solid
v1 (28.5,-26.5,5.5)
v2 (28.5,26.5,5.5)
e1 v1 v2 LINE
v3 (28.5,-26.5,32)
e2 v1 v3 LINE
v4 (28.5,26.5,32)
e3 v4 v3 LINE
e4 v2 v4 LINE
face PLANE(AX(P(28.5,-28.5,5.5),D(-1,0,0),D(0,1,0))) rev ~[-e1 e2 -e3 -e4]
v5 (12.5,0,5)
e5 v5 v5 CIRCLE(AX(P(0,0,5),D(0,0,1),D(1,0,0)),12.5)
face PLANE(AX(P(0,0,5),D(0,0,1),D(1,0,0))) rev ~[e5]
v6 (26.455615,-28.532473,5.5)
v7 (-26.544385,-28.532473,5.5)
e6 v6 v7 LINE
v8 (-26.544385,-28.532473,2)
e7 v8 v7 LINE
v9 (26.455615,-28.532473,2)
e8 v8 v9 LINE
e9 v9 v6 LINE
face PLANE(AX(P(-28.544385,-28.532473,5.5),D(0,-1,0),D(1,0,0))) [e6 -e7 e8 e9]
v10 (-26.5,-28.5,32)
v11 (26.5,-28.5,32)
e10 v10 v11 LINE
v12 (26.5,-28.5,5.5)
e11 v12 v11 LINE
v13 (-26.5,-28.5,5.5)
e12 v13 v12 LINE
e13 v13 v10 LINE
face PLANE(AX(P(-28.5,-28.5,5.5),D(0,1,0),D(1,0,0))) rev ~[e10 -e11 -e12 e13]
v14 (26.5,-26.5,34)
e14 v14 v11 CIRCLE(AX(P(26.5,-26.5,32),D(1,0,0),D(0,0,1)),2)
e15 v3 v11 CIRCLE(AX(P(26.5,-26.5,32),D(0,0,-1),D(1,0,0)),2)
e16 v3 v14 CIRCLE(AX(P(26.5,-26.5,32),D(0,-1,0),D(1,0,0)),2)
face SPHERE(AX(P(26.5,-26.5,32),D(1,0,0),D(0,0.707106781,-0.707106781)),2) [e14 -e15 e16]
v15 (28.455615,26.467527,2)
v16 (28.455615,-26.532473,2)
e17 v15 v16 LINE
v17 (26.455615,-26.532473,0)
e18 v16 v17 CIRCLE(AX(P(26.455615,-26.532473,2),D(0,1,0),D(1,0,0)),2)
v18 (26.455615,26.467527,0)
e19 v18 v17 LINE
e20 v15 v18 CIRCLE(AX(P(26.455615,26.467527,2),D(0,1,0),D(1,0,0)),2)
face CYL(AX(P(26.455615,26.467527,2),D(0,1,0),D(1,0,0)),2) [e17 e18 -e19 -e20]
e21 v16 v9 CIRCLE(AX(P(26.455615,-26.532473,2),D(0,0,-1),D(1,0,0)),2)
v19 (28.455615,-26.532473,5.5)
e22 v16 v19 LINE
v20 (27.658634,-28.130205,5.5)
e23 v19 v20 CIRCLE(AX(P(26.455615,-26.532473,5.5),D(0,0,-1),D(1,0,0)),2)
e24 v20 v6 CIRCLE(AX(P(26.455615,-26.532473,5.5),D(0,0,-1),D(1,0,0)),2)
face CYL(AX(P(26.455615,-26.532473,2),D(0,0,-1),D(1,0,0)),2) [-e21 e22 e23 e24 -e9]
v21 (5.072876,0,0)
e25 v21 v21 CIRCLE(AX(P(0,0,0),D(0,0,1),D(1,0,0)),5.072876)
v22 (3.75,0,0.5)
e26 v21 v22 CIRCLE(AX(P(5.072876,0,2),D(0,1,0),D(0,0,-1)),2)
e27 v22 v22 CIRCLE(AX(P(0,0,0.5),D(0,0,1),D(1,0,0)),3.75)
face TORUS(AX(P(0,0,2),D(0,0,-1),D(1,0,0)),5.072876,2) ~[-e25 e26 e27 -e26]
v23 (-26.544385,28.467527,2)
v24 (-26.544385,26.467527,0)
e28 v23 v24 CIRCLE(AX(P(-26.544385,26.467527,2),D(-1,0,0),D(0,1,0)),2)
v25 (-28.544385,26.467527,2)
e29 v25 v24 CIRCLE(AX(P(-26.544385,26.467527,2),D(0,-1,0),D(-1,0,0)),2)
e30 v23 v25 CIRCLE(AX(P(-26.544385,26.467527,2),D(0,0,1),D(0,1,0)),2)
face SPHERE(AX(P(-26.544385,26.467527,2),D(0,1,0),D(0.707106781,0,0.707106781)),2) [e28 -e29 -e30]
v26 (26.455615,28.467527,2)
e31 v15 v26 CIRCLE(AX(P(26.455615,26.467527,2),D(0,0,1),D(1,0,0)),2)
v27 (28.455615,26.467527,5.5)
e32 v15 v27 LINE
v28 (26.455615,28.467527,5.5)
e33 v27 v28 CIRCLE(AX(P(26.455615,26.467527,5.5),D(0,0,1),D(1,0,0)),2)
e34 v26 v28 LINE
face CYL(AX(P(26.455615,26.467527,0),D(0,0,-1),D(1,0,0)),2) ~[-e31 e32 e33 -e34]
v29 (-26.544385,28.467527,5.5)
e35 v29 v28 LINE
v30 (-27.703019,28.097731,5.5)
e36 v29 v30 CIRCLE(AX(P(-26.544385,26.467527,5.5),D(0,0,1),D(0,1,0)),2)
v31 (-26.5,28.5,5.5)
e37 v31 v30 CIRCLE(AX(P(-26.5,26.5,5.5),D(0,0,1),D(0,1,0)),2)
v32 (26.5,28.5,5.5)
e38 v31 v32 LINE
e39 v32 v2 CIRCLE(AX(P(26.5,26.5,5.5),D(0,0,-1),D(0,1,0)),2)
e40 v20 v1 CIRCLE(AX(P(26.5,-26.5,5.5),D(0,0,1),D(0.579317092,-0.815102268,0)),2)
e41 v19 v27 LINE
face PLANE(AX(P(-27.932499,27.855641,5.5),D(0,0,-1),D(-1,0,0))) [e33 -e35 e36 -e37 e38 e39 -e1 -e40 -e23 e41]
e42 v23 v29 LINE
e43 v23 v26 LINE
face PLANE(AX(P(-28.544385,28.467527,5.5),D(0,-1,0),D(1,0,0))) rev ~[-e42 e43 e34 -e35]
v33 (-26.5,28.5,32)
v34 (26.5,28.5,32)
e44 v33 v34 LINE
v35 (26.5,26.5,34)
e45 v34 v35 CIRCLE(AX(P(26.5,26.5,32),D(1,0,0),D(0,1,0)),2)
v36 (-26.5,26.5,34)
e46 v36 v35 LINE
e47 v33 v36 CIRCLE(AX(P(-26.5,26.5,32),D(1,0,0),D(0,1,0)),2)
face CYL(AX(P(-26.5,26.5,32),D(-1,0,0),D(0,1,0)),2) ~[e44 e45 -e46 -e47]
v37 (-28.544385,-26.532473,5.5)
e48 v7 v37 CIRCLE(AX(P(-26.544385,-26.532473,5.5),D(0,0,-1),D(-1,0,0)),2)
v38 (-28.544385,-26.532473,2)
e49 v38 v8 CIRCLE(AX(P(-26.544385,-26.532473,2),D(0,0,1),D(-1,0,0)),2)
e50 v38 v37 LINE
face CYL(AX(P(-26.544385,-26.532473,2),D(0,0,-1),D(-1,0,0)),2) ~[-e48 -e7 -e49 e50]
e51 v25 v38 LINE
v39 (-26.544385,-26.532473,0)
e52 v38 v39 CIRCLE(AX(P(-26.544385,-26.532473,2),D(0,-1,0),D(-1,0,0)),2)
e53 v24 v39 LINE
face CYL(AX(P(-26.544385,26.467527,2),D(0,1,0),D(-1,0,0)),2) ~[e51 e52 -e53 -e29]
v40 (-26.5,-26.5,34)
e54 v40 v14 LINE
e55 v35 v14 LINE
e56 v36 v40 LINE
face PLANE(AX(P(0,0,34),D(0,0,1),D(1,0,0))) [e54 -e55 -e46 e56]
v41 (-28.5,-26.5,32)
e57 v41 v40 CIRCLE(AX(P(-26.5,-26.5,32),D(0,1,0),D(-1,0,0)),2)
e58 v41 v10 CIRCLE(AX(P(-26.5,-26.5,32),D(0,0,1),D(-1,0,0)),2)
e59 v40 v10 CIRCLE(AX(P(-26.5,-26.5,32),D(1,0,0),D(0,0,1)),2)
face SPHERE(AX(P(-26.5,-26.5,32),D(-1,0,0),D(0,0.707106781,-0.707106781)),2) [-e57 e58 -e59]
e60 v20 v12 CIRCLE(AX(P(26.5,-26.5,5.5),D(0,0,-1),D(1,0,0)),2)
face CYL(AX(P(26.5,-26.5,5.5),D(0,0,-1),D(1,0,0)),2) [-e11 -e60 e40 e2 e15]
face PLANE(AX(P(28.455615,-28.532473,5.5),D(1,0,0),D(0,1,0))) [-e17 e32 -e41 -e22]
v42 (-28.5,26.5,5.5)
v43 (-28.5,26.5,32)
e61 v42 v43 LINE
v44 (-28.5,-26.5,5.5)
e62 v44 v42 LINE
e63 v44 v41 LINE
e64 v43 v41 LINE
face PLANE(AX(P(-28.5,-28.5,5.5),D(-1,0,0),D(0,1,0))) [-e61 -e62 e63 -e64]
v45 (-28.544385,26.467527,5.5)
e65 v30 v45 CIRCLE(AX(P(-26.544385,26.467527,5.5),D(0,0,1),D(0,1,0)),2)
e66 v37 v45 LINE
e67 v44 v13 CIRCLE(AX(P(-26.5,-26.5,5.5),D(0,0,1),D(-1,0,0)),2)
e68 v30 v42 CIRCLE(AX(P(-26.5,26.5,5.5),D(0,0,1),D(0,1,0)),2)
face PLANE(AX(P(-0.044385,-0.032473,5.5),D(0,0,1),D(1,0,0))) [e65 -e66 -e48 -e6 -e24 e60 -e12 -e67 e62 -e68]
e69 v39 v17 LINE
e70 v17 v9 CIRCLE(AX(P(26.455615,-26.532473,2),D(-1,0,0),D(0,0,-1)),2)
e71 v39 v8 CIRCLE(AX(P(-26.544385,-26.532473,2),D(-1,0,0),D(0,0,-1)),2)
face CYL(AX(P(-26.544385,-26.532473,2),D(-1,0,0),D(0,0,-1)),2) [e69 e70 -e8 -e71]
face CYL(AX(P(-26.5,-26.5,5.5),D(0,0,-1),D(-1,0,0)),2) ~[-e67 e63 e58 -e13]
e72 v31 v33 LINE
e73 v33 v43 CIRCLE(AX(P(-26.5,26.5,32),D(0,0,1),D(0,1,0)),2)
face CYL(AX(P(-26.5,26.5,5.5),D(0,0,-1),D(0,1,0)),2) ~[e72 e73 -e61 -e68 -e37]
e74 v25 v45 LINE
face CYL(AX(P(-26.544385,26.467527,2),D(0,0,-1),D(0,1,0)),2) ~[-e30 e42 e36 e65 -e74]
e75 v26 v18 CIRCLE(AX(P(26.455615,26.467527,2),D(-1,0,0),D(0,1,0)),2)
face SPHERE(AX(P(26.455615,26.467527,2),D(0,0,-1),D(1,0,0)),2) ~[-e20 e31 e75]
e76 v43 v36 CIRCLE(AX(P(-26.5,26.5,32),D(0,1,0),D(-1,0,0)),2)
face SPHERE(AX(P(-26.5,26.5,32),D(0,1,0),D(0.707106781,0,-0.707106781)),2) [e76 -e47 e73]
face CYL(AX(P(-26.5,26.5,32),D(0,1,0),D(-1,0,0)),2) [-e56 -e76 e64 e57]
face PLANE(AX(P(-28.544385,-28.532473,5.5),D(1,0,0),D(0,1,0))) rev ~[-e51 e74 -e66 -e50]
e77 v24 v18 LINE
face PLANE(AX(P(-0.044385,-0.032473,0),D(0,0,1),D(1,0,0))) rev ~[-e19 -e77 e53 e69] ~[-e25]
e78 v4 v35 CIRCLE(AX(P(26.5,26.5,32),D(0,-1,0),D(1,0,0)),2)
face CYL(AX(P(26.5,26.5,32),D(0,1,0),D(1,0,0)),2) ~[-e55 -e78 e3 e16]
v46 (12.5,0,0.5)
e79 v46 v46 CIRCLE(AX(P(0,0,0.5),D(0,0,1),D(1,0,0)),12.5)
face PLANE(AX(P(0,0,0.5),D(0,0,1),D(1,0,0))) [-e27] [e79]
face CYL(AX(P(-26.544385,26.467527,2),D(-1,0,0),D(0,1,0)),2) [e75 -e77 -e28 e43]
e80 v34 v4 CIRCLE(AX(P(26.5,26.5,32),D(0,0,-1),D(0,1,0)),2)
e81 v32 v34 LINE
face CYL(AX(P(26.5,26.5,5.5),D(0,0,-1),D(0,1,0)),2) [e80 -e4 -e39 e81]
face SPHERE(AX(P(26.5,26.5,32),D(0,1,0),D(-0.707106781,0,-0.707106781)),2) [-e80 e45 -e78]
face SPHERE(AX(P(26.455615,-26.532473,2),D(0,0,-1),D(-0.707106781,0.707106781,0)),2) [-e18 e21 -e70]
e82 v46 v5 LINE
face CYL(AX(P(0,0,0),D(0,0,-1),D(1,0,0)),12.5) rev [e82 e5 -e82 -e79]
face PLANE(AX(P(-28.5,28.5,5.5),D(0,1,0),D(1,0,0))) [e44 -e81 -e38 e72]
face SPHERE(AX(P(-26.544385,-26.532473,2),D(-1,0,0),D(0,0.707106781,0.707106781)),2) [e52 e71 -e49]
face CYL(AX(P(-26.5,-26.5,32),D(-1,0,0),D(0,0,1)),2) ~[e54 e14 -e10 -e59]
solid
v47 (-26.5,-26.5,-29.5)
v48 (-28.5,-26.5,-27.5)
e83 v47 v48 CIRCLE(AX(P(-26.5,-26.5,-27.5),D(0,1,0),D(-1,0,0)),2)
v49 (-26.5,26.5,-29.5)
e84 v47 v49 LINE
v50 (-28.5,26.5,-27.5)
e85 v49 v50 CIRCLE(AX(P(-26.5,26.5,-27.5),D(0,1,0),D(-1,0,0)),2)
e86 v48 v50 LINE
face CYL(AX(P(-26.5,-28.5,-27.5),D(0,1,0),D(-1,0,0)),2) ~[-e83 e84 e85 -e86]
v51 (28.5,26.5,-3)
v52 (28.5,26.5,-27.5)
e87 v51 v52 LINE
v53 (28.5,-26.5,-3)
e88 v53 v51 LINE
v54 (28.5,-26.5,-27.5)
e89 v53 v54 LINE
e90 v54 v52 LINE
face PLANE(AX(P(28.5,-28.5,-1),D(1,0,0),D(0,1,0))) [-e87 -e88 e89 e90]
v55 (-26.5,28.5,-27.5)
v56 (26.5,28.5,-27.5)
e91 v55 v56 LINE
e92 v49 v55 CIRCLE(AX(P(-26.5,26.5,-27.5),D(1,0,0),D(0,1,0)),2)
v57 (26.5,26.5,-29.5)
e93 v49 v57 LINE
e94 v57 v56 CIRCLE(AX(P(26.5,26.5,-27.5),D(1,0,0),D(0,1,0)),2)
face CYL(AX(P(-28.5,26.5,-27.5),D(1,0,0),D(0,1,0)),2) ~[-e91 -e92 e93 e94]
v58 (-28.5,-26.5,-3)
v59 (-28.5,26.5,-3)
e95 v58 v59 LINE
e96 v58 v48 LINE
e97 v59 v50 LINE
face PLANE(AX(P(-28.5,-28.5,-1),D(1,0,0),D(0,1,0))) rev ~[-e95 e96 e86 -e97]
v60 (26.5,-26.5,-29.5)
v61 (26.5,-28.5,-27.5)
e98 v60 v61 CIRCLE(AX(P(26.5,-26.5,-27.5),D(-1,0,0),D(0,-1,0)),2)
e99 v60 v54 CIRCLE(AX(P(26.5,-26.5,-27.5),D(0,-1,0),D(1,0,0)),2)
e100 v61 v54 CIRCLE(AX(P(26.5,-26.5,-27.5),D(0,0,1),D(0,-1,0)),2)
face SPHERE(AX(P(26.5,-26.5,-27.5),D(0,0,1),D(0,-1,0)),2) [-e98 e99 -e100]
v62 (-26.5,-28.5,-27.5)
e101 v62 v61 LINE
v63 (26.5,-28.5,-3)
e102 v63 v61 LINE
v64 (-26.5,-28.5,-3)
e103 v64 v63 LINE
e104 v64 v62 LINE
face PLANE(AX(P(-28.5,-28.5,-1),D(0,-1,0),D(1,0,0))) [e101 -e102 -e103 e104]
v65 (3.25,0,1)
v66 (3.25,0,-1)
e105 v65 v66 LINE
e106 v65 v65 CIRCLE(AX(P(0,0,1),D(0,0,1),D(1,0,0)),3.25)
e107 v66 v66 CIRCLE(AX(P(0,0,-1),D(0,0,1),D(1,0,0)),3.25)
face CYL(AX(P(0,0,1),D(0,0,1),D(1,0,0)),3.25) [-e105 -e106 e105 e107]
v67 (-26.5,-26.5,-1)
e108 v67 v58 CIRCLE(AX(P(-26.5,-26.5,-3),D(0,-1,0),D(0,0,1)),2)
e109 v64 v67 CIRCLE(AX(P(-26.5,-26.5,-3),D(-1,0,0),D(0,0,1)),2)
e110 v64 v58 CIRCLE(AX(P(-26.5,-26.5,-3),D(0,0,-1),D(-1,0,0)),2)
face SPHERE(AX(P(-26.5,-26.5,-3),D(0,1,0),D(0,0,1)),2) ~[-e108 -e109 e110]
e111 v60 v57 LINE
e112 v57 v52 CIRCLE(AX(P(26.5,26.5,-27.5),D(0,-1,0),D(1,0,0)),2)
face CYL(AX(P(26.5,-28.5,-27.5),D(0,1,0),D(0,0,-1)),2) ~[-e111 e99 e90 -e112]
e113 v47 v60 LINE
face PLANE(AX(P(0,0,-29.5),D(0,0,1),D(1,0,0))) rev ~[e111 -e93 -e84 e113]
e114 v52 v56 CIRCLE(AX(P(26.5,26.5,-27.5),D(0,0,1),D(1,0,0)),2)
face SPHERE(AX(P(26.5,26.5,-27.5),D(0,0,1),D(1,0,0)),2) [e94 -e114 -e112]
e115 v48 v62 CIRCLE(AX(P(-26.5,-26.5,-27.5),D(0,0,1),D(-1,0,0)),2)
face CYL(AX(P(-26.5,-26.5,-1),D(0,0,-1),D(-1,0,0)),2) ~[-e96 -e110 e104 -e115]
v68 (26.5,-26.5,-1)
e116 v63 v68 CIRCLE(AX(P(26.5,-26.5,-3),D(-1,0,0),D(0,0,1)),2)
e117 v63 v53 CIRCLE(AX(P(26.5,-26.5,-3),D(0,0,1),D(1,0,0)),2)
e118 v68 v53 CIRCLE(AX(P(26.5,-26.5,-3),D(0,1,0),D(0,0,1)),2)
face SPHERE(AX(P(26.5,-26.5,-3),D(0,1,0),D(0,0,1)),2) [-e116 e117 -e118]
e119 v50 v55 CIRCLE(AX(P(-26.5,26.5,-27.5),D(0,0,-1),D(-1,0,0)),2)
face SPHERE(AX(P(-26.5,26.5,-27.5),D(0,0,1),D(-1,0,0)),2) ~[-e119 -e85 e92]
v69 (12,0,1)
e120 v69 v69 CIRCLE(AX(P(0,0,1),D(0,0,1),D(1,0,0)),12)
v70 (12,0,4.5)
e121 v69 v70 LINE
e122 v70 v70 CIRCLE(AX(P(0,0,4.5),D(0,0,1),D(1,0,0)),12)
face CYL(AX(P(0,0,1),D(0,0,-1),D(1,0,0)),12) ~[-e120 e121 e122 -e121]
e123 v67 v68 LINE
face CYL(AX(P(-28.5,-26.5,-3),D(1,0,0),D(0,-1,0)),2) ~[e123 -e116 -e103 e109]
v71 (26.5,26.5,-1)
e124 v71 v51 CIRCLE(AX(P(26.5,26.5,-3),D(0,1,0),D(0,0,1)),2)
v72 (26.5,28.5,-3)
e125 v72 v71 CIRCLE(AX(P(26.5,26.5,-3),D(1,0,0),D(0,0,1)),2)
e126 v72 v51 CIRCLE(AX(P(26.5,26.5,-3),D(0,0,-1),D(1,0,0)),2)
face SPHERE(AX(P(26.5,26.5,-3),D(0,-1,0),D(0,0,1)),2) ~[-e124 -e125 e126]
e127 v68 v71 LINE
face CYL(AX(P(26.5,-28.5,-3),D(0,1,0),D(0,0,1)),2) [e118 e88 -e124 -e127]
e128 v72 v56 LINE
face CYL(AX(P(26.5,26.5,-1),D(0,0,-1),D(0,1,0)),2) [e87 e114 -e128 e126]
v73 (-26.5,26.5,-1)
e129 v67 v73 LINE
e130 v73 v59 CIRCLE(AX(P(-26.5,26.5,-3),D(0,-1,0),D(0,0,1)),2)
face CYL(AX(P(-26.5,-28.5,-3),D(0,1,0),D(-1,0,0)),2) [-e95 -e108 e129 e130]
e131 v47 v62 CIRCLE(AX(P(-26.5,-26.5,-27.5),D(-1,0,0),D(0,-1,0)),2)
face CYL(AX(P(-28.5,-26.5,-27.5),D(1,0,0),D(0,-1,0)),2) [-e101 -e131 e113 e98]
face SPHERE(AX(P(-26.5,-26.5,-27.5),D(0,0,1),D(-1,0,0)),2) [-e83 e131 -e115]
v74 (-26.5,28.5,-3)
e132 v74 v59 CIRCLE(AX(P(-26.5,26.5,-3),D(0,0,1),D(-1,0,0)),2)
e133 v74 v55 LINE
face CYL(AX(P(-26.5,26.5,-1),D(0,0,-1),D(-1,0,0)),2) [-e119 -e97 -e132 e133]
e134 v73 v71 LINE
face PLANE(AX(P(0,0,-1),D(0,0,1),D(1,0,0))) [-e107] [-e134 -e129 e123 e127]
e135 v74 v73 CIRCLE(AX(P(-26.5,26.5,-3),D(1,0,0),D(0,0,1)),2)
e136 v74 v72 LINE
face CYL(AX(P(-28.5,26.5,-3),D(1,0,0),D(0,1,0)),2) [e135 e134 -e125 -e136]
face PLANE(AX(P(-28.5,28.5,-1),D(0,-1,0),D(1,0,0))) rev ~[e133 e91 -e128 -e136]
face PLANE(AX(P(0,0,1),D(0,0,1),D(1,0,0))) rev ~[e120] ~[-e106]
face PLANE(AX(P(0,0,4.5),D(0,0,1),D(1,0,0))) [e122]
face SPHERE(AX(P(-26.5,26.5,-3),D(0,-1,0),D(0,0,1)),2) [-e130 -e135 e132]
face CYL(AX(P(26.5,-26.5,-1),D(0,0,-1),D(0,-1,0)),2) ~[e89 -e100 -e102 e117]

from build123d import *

# Parameters (mm, degrees)
F0_R          = 13.5
F0_R_2        = 12.5
F1_DEPTH      = 5
F3_R          = 12
F4_DEPTH      = 3.5
F5_R          = 12.5
F5_R_2        = 3.75
F6_DEPTH      = 0.5
F8_R          = 13.5
F9_DEPTH      = 0.5
F10_R         = 3.25
F11_DEPTH     = 2
F13_W         = 57
F13_H         = 57
F14_DEPTH     = 28.5
F15_R         = 2
F17_W         = 57
F17_H         = 57
F18_DEPTH     = 28.5
F19_W         = 57
F19_H         = 57
F19_R         = 13.5
F20_DEPTH     = 5.5
F21_T1_DEPTH  = 26.5
F21_T3_DEPTH  = 5.5
F21_T5_DEPTH  = 53
F21_T7_DEPTH  = 53
F21_S11_W     = 2.04
F21_S11_H     = 2.04
F21_T12_DEPTH = 2.04
F21_S17_W     = 2.04
F21_S17_H     = 2.04
F21_T18_DEPTH = 2.04
F21_S23_W     = 2.04
F21_S23_H     = 2.04
F21_T24_DEPTH = 2.04
F21_S29_W     = 2.04
F21_S29_H     = 2.04
F21_T30_DEPTH = 2.04
F22_T1_DEPTH  = 3.5
F22_T3_DEPTH  = 8.5
F22_T5_DEPTH  = 53
F22_T7_DEPTH  = 53
F22_S11_W     = 2.04
F22_S11_H     = 2.04
F22_T12_DEPTH = 2.04
F22_S17_W     = 2.04
F22_S17_H     = 2.04
F22_T18_DEPTH = 2.04
F22_S23_W     = 2.04
F22_S23_H     = 2.04
F22_T24_DEPTH = 2.04
F22_T28_ANGLE = 89.9999999955


# Not quite as in the source:
# - a fillet or chamfer that OpenCascade refuses, or shapes differently, is made with other operations: its cross-section is extruded or revolved along the edge and cut away or added


with BuildPart() as f1:
    # F0 (on Top) → F1 (new body)
    with BuildSketch(Plane.XY):
        Circle(F0_R)
        Circle(F0_R_2, mode=Mode.SUBTRACT)
    extrude(amount=F1_DEPTH)

    # F5 (on Top) → F6 (join)
    with BuildSketch(Plane.XY):
        Circle(F5_R)
        Circle(F5_R_2, mode=Mode.SUBTRACT)
    extrude(amount=F6_DEPTH)

    # F8 (on offset) → F9 (join)
    with BuildSketch(Plane.XY.offset(5)):
        Circle(F8_R)
    extrude(amount=F9_DEPTH)

    # F17 (on offset) → F18 (join)
    with BuildSketch(Plane.XY.offset(5.5)):
        Rectangle(F17_W, F17_H)
    extrude(amount=F18_DEPTH)

    # F19 (on offset) → F20 (join)
    with BuildSketch(Plane.XY.offset(5.5)):
        with Locations((-0.0443849862, -0.0324733704)):
            Rectangle(F19_W, F19_H)
        Circle(F19_R, mode=Mode.SUBTRACT)
    extrude(amount=-F20_DEPTH)

    # F21: fillet of radius 2 on 9 edges, made by hand

    # F21_s2 → F21_t1 (cut)
    with BuildSketch(Plane.XY.offset(5.5)):
        with BuildLine():
            ThreePointArc((26.5, 28.5), (27.9142135624, 27.9142135624), (28.5, 26.5))
            Line((28.5, 26.5), (28.54, 26.5))
            Line((28.54, 26.5), (28.54, 28.54))
            Line((28.54, 28.54), (26.5, 28.54))
            Line((26.5, 28.54), (26.5, 28.5))
        make_face()
        with BuildLine():
            ThreePointArc((28.5, -26.5), (27.9142135624, -27.9142135624), (26.5, -28.5))
            Line((26.5, -28.5), (26.5, -28.54))
            Line((26.5, -28.54), (28.54, -28.54))
            Line((28.54, -28.54), (28.54, -26.5))
            Line((28.54, -26.5), (28.5, -26.5))
        make_face()
        with BuildLine():
            ThreePointArc((-28.5, -26.5), (-27.9142135624, -27.9142135624), (-26.5, -28.5))
            Line((-26.5, -28.5), (-26.5, -28.54))
            Line((-26.5, -28.54), (-28.54, -28.54))
            Line((-28.54, -28.54), (-28.54, -26.5))
            Line((-28.54, -26.5), (-28.5, -26.5))
        make_face()
        with BuildLine():
            ThreePointArc((-26.5, 28.5), (-27.9142135624, 27.9142135624), (-28.5, 26.5))
            Line((-28.5, 26.5), (-28.54, 26.5))
            Line((-28.54, 26.5), (-28.54, 28.54))
            Line((-28.54, 28.54), (-26.5, 28.54))
            Line((-26.5, 28.54), (-26.5, 28.5))
        make_face()
    extrude(amount=F21_T1_DEPTH, mode=Mode.SUBTRACT)

    # F21_s4 → F21_t3 (cut)
    with BuildSketch(Plane.XY):
        with BuildLine():
            ThreePointArc((28.4556150138, 26.4675266296), (27.8698285762, 27.8817401919), (26.4556150138, 28.4675266296))
            Line((26.4556150138, 28.4675266296), (26.4556150138, 28.5075266296))
            Line((26.4556150138, 28.5075266296), (28.4956150138, 28.5075266296))
            Line((28.4956150138, 28.5075266296), (28.4956150138, 26.4675266296))
            Line((28.4956150138, 26.4675266296), (28.4556150138, 26.4675266296))
        make_face()
    extrude(amount=F21_T3_DEPTH, mode=Mode.SUBTRACT)

    # F21_s6 → F21_t5 (cut)
    with BuildSketch(Plane.YZ.offset(-26.5)):
        with BuildLine():
            ThreePointArc((28.5, 32), (27.9142135624, 33.4142135624), (26.5, 34))
            Line((26.5, 34), (26.5, 34.04))
            Line((26.5, 34.04), (28.54, 34.04))
            Line((28.54, 34.04), (28.54, 32))
            Line((28.54, 32), (28.5, 32))
        make_face()
        with BuildLine():
            ThreePointArc((-26.5, 34), (-27.9142135624, 33.4142135624), (-28.5, 32))
            Line((-28.5, 32), (-28.54, 32))
            Line((-28.54, 32), (-28.54, 34.04))
            Line((-28.54, 34.04), (-26.5, 34.04))
            Line((-26.5, 34.04), (-26.5, 34))
        make_face()
    extrude(amount=F21_T5_DEPTH, mode=Mode.SUBTRACT)

    # F21_s8 → F21_t7 (cut)
    with BuildSketch(Plane.XZ.offset(-26.5)):
        with BuildLine():
            ThreePointArc((-28.5, 32), (-27.9142135624, 33.4142135624), (-26.5, 34))
            Line((-26.5, 34), (-26.5, 34.04))
            Line((-26.5, 34.04), (-28.54, 34.04))
            Line((-28.54, 34.04), (-28.54, 32))
            Line((-28.54, 32), (-28.5, 32))
        make_face()
        with BuildLine():
            ThreePointArc((28.5, 32), (27.9142135624, 33.4142135624), (26.5, 34))
            Line((26.5, 34), (26.5, 34.04))
            Line((26.5, 34.04), (28.54, 34.04))
            Line((28.54, 34.04), (28.54, 32))
            Line((28.54, 32), (28.5, 32))
        make_face()
    extrude(amount=F21_T7_DEPTH, mode=Mode.SUBTRACT)


with BuildPart() as f4:
    # F3 (on offset) → F4 (new body)
    with BuildSketch(Plane.XY.offset(1)):
        Circle(F3_R)
    extrude(amount=F4_DEPTH)

    # F10 (on offset) → F11 (join)
    with BuildSketch(Plane.XY.offset(1)):
        Circle(F10_R)
    extrude(amount=-F11_DEPTH)

    # F13 (on offset) → F14 (join)
    with BuildSketch(Plane.XY.offset(-1)):
        Rectangle(F13_W, F13_H)
    extrude(amount=-F14_DEPTH)

    # F15
    f15_edges = [f4.edges().sort_by_distance(p)[0] for p in [
        (28.5, 0, -1),
        (-28.5, 0, -1),
        (0, -28.5, -1),
        (0, 28.5, -1),
        (-28.5, 28.5, -15.25),
        (28.5, 28.5, -15.25),
        (-28.5, -28.5, -15.25),
        (28.5, -28.5, -15.25),
        (-28.5, 0, -29.5),
        (0, -28.5, -29.5),
        (28.5, 0, -29.5),
        (0, 28.5, -29.5),
    ]]
    fillet(f15_edges, radius=F15_R)


with BuildPart() as f21_tool10:
    # F21_s11 → F21_t12 (new body)
    with BuildSketch(Plane.XZ.offset(-26.5)):
        with Locations((27.52, 33.02)):
            Rectangle(F21_S11_W, F21_S11_H)
    extrude(amount=-F21_T12_DEPTH)

    # F21_s13 → F21_t14 (revolve, cut)
    with BuildSketch(Plane(origin=(26.5, 26.5, 32), x_dir=(-0.7071067812, 0, -0.7071067812), z_dir=(0.7071067812, 0, -0.7071067812))):
        with BuildLine():
            ThreePointArc((0, -2), (2, 0), (0, 2))
            Line((0, 2), (0, -2))
        make_face()
    revolve(axis=Axis((26.5, 26.5, 32), (0, 1, 0)), mode=Mode.SUBTRACT)


with BuildPart() as f1_1:
    add(f1.part)

    # F21_t9: cut F21_tool10
    add(f21_tool10.part, mode=Mode.SUBTRACT)


with BuildPart() as f21_tool16:
    # F21_s17 → F21_t18 (new body)
    with BuildSketch(Plane.XZ.offset(-26.5)):
        with Locations((-27.52, 33.02)):
            Rectangle(F21_S17_W, F21_S17_H)
    extrude(amount=-F21_T18_DEPTH)

    # F21_s19 → F21_t20 (revolve, cut)
    with BuildSketch(Plane(origin=(-26.5, 26.5, 32), x_dir=(0.7071067812, 0, -0.7071067812), z_dir=(0.7071067812, 0, 0.7071067812))):
        with BuildLine():
            ThreePointArc((0, -2), (2, 0), (0, 2))
            Line((0, 2), (0, -2))
        make_face()
    revolve(axis=Axis((-26.5, 26.5, 32), (0, 1, 0)), mode=Mode.SUBTRACT)


with BuildPart() as f1_2:
    add(f1_1.part)

    # F21_t15: cut F21_tool16
    add(f21_tool16.part, mode=Mode.SUBTRACT)


with BuildPart() as f21_tool22:
    # F21_s23 → F21_t24 (new body)
    with BuildSketch(Plane.YZ.offset(-26.5)):
        with Locations((-27.52, 33.02)):
            Rectangle(F21_S23_W, F21_S23_H)
    extrude(amount=-F21_T24_DEPTH)

    # F21_s25 → F21_t26 (revolve, cut)
    with BuildSketch(Plane(origin=(-26.5, -26.5, 32), x_dir=(0, 0.7071067812, -0.7071067812), z_dir=(0, 0.7071067812, 0.7071067812))):
        with BuildLine():
            ThreePointArc((0, -2), (2, 0), (0, 2))
            Line((0, 2), (0, -2))
        make_face()
    revolve(axis=Axis((-26.5, -26.5, 32), (-1, 0, 0)), mode=Mode.SUBTRACT)


with BuildPart() as f1_3:
    add(f1_2.part)

    # F21_t21: cut F21_tool22
    add(f21_tool22.part, mode=Mode.SUBTRACT)


with BuildPart() as f21_tool28:
    # F21_s29 → F21_t30 (new body)
    with BuildSketch(Plane.YZ.offset(26.5)):
        with Locations((-27.52, 33.02)):
            Rectangle(F21_S29_W, F21_S29_H)
    extrude(amount=F21_T30_DEPTH)

    # F21_s31 → F21_t32 (revolve, cut)
    with BuildSketch(Plane(origin=(26.5, -26.5, 32), x_dir=(0, 0.7071067812, -0.7071067812), z_dir=(0, -0.7071067812, -0.7071067812))):
        with BuildLine():
            ThreePointArc((0, -2), (2, 0), (0, 2))
            Line((0, 2), (0, -2))
        make_face()
    revolve(axis=Axis((26.5, -26.5, 32), (1, 0, 0)), mode=Mode.SUBTRACT)


with BuildPart() as f1_4:
    add(f1_3.part)

    # F21_t27: cut F21_tool28
    add(f21_tool28.part, mode=Mode.SUBTRACT)

    # F22: fillet of radius 2 on 9 edges, made by hand

    # F22_s2 → F22_t1 (cut)
    with BuildSketch(Plane.XY.offset(2)):
        with BuildLine():
            ThreePointArc((28.4556150138, -26.5324733704), (27.8698285762, -27.9466869328), (26.4556150138, -28.5324733704))
            Line((26.4556150138, -28.5324733704), (28.4556150138, -28.5324733704))
            Line((28.4556150138, -28.5324733704), (28.4556150138, -26.5324733704))
        make_face()
        with BuildLine():
            ThreePointArc((-26.5443849862, 28.4675266296), (-27.9585985485, 27.8817401919), (-28.5443849862, 26.4675266296))
            Line((-28.5443849862, 26.4675266296), (-28.5443849862, 28.4675266296))
            Line((-28.5443849862, 28.4675266296), (-26.5443849862, 28.4675266296))
        make_face()
    extrude(amount=F22_T1_DEPTH, mode=Mode.SUBTRACT)

    # F22_s4 → F22_t3 (cut)
    with BuildSketch(Plane.XY.offset(2)):
        with BuildLine():
            ThreePointArc((-28.5443849862, -26.5324733704), (-27.9585985485, -27.9466869328), (-26.5443849862, -28.5324733704))
            Line((-26.5443849862, -28.5324733704), (-28.5443849862, -28.5324733704))
            Line((-28.5443849862, -28.5324733704), (-28.5443849862, -26.5324733704))
        make_face()
    extrude(amount=F22_T3_DEPTH, mode=Mode.SUBTRACT)

    # F22_s6 → F22_t5 (cut)
    with BuildSketch(Plane.YZ.offset(-26.5443849862)):
        with BuildLine():
            ThreePointArc((28.4675266296, 2), (27.8817401919, 0.5857864376), (26.4675266296, 0))
            Line((26.4675266296, 0), (28.4675266296, 0))
            Line((28.4675266296, 0), (28.4675266296, 2))
        make_face()
        with BuildLine():
            ThreePointArc((-26.5324733704, 0), (-27.9466869328, 0.5857864376), (-28.5324733704, 2))
            Line((-28.5324733704, 2), (-28.5324733704, 0))
            Line((-28.5324733704, 0), (-26.5324733704, 0))
        make_face()
    extrude(amount=F22_T5_DEPTH, mode=Mode.SUBTRACT)

    # F22_s8 → F22_t7 (cut)
    with BuildSketch(Plane.XZ.offset(-26.4675266296)):
        with BuildLine():
            ThreePointArc((28.4556150138, 2), (27.8698285762, 0.5857864376), (26.4556150138, 0))
            Line((26.4556150138, 0), (28.4556150138, 0))
            Line((28.4556150138, 0), (28.4556150138, 2))
        make_face()
        with BuildLine():
            ThreePointArc((-28.5443849862, 2), (-27.9585985485, 0.5857864376), (-26.5443849862, 0))
            Line((-26.5443849862, 0), (-28.5443849862, 0))
            Line((-28.5443849862, 0), (-28.5443849862, 2))
        make_face()
    extrude(amount=F22_T7_DEPTH, mode=Mode.SUBTRACT)


with BuildPart() as f22_tool10:
    # F22_s11 → F22_t12 (new body)
    with BuildSketch(Plane.XY.offset(2)):
        with Locations((27.4756150138, -27.5524733704)):
            Rectangle(F22_S11_W, F22_S11_H)
    extrude(amount=-F22_T12_DEPTH)

    # F22_s13 → F22_t14 (revolve, cut)
    with BuildSketch(Plane(origin=(26.4556150138, -26.5324733704, 2), x_dir=(-0.7071067812, 0.7071067812, 0), z_dir=(-0.7071067812, -0.7071067812, 0))):
        with BuildLine():
            ThreePointArc((0, -2), (2, 0), (0, 2))
            Line((0, 2), (0, -2))
        make_face()
    revolve(axis=Axis((26.4556150138, -26.5324733704, 2), (0, 0, -1)), mode=Mode.SUBTRACT)


with BuildPart() as f1_5:
    add(f1_4.part)

    # F22_t9: cut F22_tool10
    add(f22_tool10.part, mode=Mode.SUBTRACT)


with BuildPart() as f22_tool16:
    # F22_s17 → F22_t18 (new body)
    with BuildSketch(Plane.YZ.offset(-26.5443849862)):
        with Locations((-27.5524733704, 0.98)):
            Rectangle(F22_S17_W, F22_S17_H)
    extrude(amount=-F22_T18_DEPTH)

    # F22_s19 → F22_t20 (revolve, cut)
    with BuildSketch(Plane(origin=(-26.5443849862, -26.5324733704, 2), x_dir=(0, 0.7071067812, 0.7071067812), z_dir=(0, -0.7071067812, 0.7071067812))):
        with BuildLine():
            ThreePointArc((0, -2), (2, 0), (0, 2))
            Line((0, 2), (0, -2))
        make_face()
    revolve(axis=Axis((-26.5443849862, -26.5324733704, 2), (-1, 0, 0)), mode=Mode.SUBTRACT)


with BuildPart() as f1_6:
    add(f1_5.part)

    # F22_t15: cut F22_tool16
    add(f22_tool16.part, mode=Mode.SUBTRACT)


with BuildPart() as f22_tool22:
    # F22_s23 → F22_t24 (new body)
    with BuildSketch(Plane.XZ.offset(-26.4675266296)):
        with Locations((-27.5643849862, 0.98)):
            Rectangle(F22_S23_W, F22_S23_H)
    extrude(amount=-F22_T24_DEPTH)

    # F22_s25 → F22_t26 (revolve, cut)
    with BuildSketch(Plane(origin=(-26.5443849862, 26.4675266296, 2), x_dir=(0.7071067812, 0, 0.7071067812), z_dir=(-0.7071067812, 0, 0.7071067812))):
        with BuildLine():
            ThreePointArc((0, -2), (2, 0), (0, 2))
            Line((0, 2), (0, -2))
        make_face()
    revolve(axis=Axis((-26.5443849862, 26.4675266296, 2), (0, 1, 0)), mode=Mode.SUBTRACT)


with BuildPart() as f1_7:
    add(f1_6.part)

    # F22_t21: cut F22_tool22
    add(f22_tool22.part, mode=Mode.SUBTRACT)

    # F22_s27 → F22_t28 (revolve, cut)
    with BuildSketch(Plane.XZ.offset(-26.4675266295)):
        with BuildLine():
            ThreePointArc((28.4556150138, 2), (27.8698285762, 0.5857864376), (26.4556150138, 0))
            Line((26.4556150138, 0), (28.4556150138, 0))
            Line((28.4556150138, 0), (28.4556150138, 2))
        make_face()
    revolve(axis=Axis((26.4556150137, 26.4675266295, 0), (0, 0, 1)), revolution_arc=F22_T28_ANGLE, mode=Mode.SUBTRACT)

    # F22_s29 → F22_t30 (revolve, cut)
    with BuildSketch(Plane.XZ):
        with BuildLine():
            ThreePointArc((5.0728756555, 0), (4.3657688743, 0.1291713066), (3.75, 0.5))
            Line((3.75, 0.5), (3.75, 0))
            Line((3.75, 0), (5.0728756555, 0))
        make_face()
    revolve(axis=Axis((0, 0, 0), (0, 0, 1)), mode=Mode.SUBTRACT)


solid = Compound([f4.part, f1_7.part])
